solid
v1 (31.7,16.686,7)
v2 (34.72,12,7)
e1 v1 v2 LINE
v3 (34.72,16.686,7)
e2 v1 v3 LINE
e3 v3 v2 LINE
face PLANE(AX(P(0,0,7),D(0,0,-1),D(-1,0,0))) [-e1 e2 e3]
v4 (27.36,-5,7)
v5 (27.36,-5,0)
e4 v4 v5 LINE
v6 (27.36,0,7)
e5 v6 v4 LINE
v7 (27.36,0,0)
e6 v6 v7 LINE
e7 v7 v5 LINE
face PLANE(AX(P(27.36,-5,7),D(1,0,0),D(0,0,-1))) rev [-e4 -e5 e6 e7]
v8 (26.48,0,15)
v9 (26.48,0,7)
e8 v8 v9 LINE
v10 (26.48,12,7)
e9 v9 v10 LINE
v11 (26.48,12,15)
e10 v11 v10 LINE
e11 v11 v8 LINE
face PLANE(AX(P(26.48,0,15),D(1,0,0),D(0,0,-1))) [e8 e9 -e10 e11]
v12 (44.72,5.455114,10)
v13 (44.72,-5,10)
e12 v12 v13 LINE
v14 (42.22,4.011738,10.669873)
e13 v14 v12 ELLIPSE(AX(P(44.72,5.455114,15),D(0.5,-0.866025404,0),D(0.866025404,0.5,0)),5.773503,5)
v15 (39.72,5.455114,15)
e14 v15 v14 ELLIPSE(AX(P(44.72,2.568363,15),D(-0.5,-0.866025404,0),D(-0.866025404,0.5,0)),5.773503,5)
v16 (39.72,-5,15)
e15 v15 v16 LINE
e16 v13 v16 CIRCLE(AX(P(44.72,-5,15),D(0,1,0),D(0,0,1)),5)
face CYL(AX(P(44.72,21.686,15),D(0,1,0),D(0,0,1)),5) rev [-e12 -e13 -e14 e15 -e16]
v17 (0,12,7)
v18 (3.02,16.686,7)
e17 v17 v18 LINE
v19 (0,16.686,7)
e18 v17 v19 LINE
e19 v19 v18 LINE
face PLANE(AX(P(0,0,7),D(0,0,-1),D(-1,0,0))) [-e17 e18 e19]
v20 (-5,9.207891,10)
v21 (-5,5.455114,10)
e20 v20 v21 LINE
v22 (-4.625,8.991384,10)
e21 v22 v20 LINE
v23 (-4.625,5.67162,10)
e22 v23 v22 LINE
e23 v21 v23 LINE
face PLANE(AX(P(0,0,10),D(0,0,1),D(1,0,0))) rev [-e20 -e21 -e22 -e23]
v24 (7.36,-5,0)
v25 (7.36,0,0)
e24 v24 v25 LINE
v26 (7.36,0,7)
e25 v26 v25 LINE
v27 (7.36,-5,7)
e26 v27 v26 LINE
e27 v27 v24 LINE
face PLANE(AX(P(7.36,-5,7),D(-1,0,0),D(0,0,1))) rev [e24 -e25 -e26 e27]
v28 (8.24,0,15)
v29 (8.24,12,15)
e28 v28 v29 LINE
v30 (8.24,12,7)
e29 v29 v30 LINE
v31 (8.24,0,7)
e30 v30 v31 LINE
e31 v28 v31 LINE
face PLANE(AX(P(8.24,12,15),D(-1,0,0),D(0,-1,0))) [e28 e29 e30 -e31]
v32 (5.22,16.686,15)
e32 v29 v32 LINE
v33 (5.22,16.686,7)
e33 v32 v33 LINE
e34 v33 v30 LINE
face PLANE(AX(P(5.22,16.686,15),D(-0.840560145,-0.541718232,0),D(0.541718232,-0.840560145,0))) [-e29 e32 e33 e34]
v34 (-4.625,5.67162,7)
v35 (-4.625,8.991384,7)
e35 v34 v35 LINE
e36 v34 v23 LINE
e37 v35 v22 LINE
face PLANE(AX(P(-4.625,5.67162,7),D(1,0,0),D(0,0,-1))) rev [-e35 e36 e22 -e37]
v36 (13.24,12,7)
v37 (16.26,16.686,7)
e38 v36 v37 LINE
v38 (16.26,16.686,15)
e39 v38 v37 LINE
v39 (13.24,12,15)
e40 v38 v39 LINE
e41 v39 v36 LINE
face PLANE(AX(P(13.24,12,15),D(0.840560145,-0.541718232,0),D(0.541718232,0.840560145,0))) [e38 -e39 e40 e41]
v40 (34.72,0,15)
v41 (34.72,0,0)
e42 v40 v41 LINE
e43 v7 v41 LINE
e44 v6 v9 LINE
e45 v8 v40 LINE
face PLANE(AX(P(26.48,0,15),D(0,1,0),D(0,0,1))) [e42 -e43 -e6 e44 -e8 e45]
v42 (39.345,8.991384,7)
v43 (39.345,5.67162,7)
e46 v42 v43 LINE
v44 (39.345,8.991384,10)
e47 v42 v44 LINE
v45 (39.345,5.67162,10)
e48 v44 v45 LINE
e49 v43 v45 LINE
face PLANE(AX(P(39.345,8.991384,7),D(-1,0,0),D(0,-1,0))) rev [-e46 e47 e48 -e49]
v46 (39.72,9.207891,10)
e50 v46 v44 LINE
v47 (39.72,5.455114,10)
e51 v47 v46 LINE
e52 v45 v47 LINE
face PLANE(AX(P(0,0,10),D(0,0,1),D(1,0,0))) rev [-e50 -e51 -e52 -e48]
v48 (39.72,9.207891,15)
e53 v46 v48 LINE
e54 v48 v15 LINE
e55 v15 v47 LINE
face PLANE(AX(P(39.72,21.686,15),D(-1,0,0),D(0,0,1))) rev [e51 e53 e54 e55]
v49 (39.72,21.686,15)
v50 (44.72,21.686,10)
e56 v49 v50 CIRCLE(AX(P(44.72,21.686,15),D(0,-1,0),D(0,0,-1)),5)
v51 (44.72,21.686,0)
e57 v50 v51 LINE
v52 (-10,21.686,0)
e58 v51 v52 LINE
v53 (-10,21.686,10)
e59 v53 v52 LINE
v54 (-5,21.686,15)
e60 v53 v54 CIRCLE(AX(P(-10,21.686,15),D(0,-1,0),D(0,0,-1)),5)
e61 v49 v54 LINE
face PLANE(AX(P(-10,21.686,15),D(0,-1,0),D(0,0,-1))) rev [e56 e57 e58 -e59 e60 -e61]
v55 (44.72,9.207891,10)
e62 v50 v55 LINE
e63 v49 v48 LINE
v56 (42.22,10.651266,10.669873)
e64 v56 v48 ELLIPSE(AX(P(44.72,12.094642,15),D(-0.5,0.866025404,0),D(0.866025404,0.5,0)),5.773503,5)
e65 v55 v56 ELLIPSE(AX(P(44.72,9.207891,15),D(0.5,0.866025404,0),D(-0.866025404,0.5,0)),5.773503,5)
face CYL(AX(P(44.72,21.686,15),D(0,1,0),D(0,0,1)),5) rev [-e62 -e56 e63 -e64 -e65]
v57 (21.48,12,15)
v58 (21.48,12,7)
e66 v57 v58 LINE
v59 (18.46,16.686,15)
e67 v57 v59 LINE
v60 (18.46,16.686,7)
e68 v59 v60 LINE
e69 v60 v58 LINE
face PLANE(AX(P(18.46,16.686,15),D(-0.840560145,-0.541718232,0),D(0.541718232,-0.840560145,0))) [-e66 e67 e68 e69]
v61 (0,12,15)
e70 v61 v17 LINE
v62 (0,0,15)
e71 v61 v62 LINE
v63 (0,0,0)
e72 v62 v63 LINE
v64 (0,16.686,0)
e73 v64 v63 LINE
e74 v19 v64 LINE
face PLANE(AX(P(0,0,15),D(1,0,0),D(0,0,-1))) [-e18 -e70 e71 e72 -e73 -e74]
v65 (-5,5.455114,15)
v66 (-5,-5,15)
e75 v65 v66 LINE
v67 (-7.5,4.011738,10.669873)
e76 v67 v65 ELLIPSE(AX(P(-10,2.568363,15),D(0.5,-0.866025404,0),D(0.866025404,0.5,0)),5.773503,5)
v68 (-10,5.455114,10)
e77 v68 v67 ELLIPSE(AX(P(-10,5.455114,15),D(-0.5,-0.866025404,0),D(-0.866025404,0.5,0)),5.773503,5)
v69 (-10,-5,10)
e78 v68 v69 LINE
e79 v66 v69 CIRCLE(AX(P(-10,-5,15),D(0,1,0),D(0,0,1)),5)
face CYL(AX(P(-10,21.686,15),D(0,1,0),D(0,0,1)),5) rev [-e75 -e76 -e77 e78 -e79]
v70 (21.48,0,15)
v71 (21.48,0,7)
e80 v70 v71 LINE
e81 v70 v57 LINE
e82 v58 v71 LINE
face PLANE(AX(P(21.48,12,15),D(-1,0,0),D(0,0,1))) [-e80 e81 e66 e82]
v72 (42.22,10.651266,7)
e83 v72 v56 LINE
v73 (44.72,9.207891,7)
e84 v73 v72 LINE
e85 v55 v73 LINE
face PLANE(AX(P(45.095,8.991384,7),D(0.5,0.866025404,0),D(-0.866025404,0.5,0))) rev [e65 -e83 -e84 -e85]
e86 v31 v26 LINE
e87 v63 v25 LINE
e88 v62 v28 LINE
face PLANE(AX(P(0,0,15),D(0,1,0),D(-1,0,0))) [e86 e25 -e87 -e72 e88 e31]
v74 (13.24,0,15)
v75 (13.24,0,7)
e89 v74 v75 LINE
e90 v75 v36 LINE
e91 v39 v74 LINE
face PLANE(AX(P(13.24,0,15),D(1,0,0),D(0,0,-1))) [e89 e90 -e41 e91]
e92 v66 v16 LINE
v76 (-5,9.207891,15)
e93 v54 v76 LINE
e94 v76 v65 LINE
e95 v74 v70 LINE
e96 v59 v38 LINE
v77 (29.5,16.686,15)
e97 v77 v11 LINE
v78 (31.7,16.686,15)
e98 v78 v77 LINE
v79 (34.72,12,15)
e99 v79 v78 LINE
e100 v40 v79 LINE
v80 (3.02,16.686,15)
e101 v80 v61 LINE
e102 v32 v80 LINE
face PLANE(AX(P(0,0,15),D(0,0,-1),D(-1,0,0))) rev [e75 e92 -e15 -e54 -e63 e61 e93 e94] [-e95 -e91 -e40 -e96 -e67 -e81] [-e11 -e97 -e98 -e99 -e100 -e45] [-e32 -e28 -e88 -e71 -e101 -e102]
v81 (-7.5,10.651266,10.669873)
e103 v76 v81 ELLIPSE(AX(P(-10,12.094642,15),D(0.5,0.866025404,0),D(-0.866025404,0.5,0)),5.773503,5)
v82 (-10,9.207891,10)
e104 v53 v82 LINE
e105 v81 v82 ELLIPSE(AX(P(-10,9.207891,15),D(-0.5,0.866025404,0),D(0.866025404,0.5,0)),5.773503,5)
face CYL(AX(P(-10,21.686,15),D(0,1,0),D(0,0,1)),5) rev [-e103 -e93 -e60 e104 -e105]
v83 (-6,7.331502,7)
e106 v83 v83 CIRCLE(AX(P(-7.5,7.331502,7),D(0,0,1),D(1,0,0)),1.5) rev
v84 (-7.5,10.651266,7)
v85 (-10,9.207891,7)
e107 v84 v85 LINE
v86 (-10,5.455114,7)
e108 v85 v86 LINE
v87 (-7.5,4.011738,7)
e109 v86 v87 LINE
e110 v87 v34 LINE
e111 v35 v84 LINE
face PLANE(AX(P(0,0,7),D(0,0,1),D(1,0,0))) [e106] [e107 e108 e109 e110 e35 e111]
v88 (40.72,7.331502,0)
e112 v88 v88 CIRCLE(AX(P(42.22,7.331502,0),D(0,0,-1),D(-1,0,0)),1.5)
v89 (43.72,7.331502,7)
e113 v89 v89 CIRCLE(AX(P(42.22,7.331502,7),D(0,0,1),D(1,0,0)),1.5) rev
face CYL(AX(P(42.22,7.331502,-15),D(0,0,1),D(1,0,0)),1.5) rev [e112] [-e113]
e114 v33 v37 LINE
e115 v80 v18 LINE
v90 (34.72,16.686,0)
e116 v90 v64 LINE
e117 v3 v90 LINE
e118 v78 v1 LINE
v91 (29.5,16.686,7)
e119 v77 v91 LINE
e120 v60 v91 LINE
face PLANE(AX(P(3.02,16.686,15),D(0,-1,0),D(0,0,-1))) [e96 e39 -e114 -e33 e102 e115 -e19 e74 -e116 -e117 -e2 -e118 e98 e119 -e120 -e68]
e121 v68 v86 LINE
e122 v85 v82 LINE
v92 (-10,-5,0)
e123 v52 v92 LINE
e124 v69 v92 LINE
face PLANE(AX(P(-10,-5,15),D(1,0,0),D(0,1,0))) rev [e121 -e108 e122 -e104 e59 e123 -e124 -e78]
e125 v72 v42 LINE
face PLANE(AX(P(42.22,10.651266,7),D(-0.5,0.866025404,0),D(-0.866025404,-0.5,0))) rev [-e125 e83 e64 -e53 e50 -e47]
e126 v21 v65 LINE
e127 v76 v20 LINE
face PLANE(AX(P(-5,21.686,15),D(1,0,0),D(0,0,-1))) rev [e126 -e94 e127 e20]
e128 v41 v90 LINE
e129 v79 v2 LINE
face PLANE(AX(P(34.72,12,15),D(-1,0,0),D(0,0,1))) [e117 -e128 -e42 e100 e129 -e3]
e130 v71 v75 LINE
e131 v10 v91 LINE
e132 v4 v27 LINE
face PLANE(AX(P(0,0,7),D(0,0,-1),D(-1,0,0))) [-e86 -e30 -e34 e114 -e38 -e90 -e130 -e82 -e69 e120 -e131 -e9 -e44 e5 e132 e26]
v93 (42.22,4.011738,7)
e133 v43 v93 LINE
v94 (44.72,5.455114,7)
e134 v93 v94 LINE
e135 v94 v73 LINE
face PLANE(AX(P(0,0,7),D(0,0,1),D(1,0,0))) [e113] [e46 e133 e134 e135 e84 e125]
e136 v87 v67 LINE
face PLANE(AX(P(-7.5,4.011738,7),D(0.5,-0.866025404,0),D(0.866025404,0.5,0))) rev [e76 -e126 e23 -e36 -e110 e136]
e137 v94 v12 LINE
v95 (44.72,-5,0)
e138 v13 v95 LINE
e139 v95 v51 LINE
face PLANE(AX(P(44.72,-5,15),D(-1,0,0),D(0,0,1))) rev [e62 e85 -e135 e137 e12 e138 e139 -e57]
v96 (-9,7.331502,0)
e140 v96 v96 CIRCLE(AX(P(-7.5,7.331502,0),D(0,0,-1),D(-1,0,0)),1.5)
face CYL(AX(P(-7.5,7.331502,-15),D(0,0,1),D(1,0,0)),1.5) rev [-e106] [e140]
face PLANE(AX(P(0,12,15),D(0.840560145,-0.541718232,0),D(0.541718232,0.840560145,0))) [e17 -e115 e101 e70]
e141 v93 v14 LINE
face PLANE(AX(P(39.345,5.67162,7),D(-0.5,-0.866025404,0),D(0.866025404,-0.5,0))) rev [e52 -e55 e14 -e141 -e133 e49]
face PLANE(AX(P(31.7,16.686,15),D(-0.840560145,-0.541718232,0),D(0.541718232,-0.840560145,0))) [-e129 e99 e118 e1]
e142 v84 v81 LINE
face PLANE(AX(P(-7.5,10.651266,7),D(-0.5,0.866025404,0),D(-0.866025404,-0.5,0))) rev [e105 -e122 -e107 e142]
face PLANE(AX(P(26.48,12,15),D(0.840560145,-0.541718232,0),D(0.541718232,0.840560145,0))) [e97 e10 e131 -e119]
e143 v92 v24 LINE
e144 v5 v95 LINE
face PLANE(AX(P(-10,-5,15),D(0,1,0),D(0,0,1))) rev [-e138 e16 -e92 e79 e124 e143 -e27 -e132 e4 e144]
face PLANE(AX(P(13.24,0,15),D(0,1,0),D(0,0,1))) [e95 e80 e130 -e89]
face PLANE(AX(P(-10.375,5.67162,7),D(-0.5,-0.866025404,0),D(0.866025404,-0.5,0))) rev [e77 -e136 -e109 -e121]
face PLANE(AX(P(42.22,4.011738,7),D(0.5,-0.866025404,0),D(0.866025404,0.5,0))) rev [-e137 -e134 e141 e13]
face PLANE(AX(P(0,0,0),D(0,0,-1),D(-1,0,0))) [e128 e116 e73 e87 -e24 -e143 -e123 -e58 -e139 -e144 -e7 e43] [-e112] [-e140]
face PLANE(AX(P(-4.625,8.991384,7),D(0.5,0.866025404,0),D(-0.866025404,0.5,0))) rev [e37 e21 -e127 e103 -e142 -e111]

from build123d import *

# Parameters (mm, degrees)
SKETCH1_W           = 54.72
SKETCH1_H           = 26.686
BOSS_EXTRUDE1_DEPTH = 15
SKETCH2_W           = 5
SKETCH2_H           = 5
CUT_EXTRUDE1_DEPTH  = 55.19428933
SKETCH3_R           = 1.5
CUT_EXTRUDE2_DEPTH  = 25
CUT_EXTRUDE3_DEPTH  = 3
CUT_EXTRUDE5_DEPTH  = 7
FILLET2_R           = 5


with BuildPart() as part:
    # Sketch1 → Boss-Extrude1 (new body)
    with BuildSketch(Plane.XY):
        with Locations((17.36, 8.343)):
            Rectangle(SKETCH1_W, SKETCH1_H)
        Polygon((0, 0), (0, 12), (3.02, 16.686), (5.22, 16.686), (8.24, 12), (8.24, 0), align=None, mode=Mode.SUBTRACT)
        Polygon((18.46, 16.686), (21.48, 12), (21.48, 0), (13.24, 0), (13.24, 12), (16.26, 16.686), align=None, mode=Mode.SUBTRACT)
        Polygon((31.7, 16.686), (34.72, 12), (34.72, 0), (26.48, 0), (26.48, 12), (29.5, 16.686), align=None, mode=Mode.SUBTRACT)
    extrude(amount=BOSS_EXTRUDE1_DEPTH)

    # Sketch2 → Cut-Extrude1 (cut, through all)
    with BuildSketch(Plane(origin=(0, -5, 0), x_dir=(-1, 0, 0), z_dir=(0, -1, 0))):
        with Locations((7.5, -12.5)):
            Rectangle(SKETCH2_W, SKETCH2_H)
        with Locations((-42.22, -12.5)):
            Rectangle(SKETCH2_W, SKETCH2_H)
    extrude(amount=-CUT_EXTRUDE1_DEPTH, mode=Mode.SUBTRACT)

    # Sketch3 → Cut-Extrude2 (cut)
    with BuildSketch(Plane.XY.offset(10)):
        with Locations((-7.5, 7.331502285)):
            Circle(SKETCH3_R)
        with Locations((42.22, 7.331502285)):
            Circle(SKETCH3_R)
    extrude(amount=-CUT_EXTRUDE2_DEPTH, mode=Mode.SUBTRACT)

    # Sketch4 → Cut-Extrude3 (cut)
    with BuildSketch(Plane.XY.offset(10)):
        Polygon((-7.5, 10.651266332), (-10.375, 8.991384309), (-10.375, 5.671620261), (-7.5, 4.011738237), (-4.625, 5.671620261), (-4.625, 8.991384309), align=None)
        Polygon((42.22, 10.651266332), (39.345, 8.991384309), (39.345, 5.671620261), (42.22, 4.011738237), (45.095, 5.671620261), (45.095, 8.991384309), align=None)
    extrude(amount=-CUT_EXTRUDE3_DEPTH, mode=Mode.SUBTRACT)

    # Sketch7 → Cut-Extrude5 (cut)
    with BuildSketch(Plane(origin=(0, 0, 0), x_dir=(-1, 0, 0), z_dir=(0, 0, -1))):
        Polygon((0, 0), (-7.36, 0), (-7.36, -5), (-27.36, -5), (-27.36, 0), (-34.72, 0), (-34.72, 16.686), (0, 16.686), align=None)
    extrude(amount=-CUT_EXTRUDE5_DEPTH, mode=Mode.SUBTRACT)

    # Fillet2
    # the kernel refuses this fillet: 5 mm, written as the material it adds along each edge
    with BuildSketch(Plane(origin=(-5, -5, 10), x_dir=(-1, 0, 0), z_dir=(0, 1, 0))) as fillet2_piece_1_section:
        with BuildLine():
            CenterArc((FILLET2_R, FILLET2_R), FILLET2_R, 180, 90)
            Line((0, FILLET2_R), (0, 0))
            Line((0, 0), (FILLET2_R, 0))
        make_face()
    fillet2_piece_1 = extrude(amount=22.95511391, mode=Mode.PRIVATE)
    fillet2_piece_1 = split(fillet2_piece_1, bisect_by=Plane(origin=(-4.358665605, 2.198087978, 11.088883398), z_dir=(-0.5, -0.8660254037844387, 0)), keep=Keep.TOP, mode=Mode.PRIVATE)
    add(fillet2_piece_1)
    with BuildSketch(Plane(origin=(-5, -17.5, 10), x_dir=(-1, 0, 0), z_dir=(0, 1, 0))) as fillet2_piece_2_section:
        with BuildLine():
            CenterArc((FILLET2_R, FILLET2_R), FILLET2_R, 180, 90)
            Line((0, FILLET2_R), (0, 0))
            Line((0, 0), (FILLET2_R, 0))
        make_face()
    fillet2_piece_2 = extrude(amount=35.45511391, mode=Mode.PRIVATE)
    fillet2_piece_2 = split(fillet2_piece_2, bisect_by=Plane(origin=(-6.083354929, 4.82963865, 11.432065422), z_dir=(0.49999999999999967, -0.8660254037844388, 0)), keep=Keep.TOP, mode=Mode.PRIVATE)
    fillet2_piece_2 = split(fillet2_piece_2, bisect_by=Plane(origin=(-6.083354929, 3.193837824, 11.432065422), z_dir=(0.5, 0.8660254037844387, 0)), keep=Keep.TOP, mode=Mode.PRIVATE)
    add(fillet2_piece_2)
    with BuildSketch(Plane(origin=(-5, -17.5, 10), x_dir=(-1, 0, 0), z_dir=(0, 1, 0))) as fillet2_piece_3_section:
        with BuildLine():
            CenterArc((FILLET2_R, FILLET2_R), FILLET2_R, 180, 90)
            Line((0, FILLET2_R), (0, 0))
            Line((0, 0), (FILLET2_R, 0))
        make_face()
    fillet2_piece_3 = extrude(amount=35.45511391, mode=Mode.PRIVATE)
    fillet2_piece_3 = split(fillet2_piece_3, bisect_by=Plane(origin=(-6.083354929, 9.83336592, 11.432065422), z_dir=(0.5000000000000001, 0.8660254037844387, 0)), keep=Keep.TOP, mode=Mode.PRIVATE)
    add(fillet2_piece_3)
    with BuildSketch(Plane(origin=(-5, -17.5, 10), x_dir=(-1, 0, 0), z_dir=(0, 1, 0))) as fillet2_piece_4_section:
        with BuildLine():
            CenterArc((FILLET2_R, FILLET2_R), FILLET2_R, 180, 90)
            Line((0, FILLET2_R), (0, 0))
            Line((0, 0), (FILLET2_R, 0))
        make_face()
    fillet2_piece_4 = extrude(amount=35.45511391, mode=Mode.PRIVATE)
    fillet2_piece_4 = split(fillet2_piece_4, bisect_by=Plane(origin=(-8.244164443, 10.221622791, 10.130784203), z_dir=(-0.5000000000000001, 0.8660254037844387, 0)), keep=Keep.TOP, mode=Mode.PRIVATE)
    add(fillet2_piece_4)
    with BuildSketch(Plane(origin=(-5, -3.292109341, 10), x_dir=(-1, 0, 0), z_dir=(0, 1, 0))) as fillet2_piece_5_section:
        with BuildLine():
            CenterArc((FILLET2_R, FILLET2_R), FILLET2_R, 180, 90)
            Line((0, FILLET2_R), (0, 0))
            Line((0, 0), (FILLET2_R, 0))
        make_face()
    fillet2_piece_5 = extrude(amount=37.478109341, mode=Mode.PRIVATE)
    fillet2_piece_5 = split(fillet2_piece_5, bisect_by=Plane(origin=(-8.244164443, 4.441381778, 10.130784203), z_dir=(-0.5, -0.8660254037844387, 0)), keep=Keep.TOP, mode=Mode.PRIVATE)
    add(fillet2_piece_5)
    with BuildSketch(Plane(origin=(-5, -3.292109341, 10), x_dir=(-1, 0, 0), z_dir=(0, 1, 0))) as fillet2_piece_6_section:
        with BuildLine():
            CenterArc((FILLET2_R, FILLET2_R), FILLET2_R, 180, 90)
            Line((0, FILLET2_R), (0, 0))
            Line((0, 0), (FILLET2_R, 0))
        make_face()
    fillet2_piece_6 = extrude(amount=37.478109341, mode=Mode.PRIVATE)
    fillet2_piece_6 = split(fillet2_piece_6, bisect_by=Plane(origin=(-6.083354929, 4.82963865, 11.432065422), z_dir=(0.49999999999999967, -0.8660254037844388, 0)), keep=Keep.TOP, mode=Mode.PRIVATE)
    add(fillet2_piece_6)
    with BuildSketch(Plane(origin=(-5, -3.292109341, 10), x_dir=(-1, 0, 0), z_dir=(0, 1, 0))) as fillet2_piece_7_section:
        with BuildLine():
            CenterArc((FILLET2_R, FILLET2_R), FILLET2_R, 180, 90)
            Line((0, FILLET2_R), (0, 0))
            Line((0, 0), (FILLET2_R, 0))
        make_face()
    fillet2_piece_7 = extrude(amount=24.978109341, mode=Mode.PRIVATE)
    fillet2_piece_7 = split(fillet2_piece_7, bisect_by=Plane(origin=(-6.083354929, 9.83336592, 11.432065422), z_dir=(0.5000000000000001, 0.8660254037844387, 0)), keep=Keep.TOP, mode=Mode.PRIVATE)
    add(fillet2_piece_7)
    with BuildSketch(Plane(origin=(-5, -3.292109341, 10), x_dir=(-1, 0, 0), z_dir=(0, 1, 0))) as fillet2_piece_8_section:
        with BuildLine():
            CenterArc((FILLET2_R, FILLET2_R), FILLET2_R, 180, 90)
            Line((0, FILLET2_R), (0, 0))
            Line((0, 0), (FILLET2_R, 0))
        make_face()
    fillet2_piece_8 = extrude(amount=37.478109341, mode=Mode.PRIVATE)
    fillet2_piece_8 = split(fillet2_piece_8, bisect_by=Plane(origin=(-8.244164443, 11.080909874, 10.130784203), z_dir=(-0.5000000000000001, -0.8660254037844387, 0)), keep=Keep.TOP, mode=Mode.PRIVATE)
    fillet2_piece_8 = split(fillet2_piece_8, bisect_by=Plane(origin=(-8.244164443, 10.221622791, 10.130784203), z_dir=(-0.5000000000000001, 0.8660254037844387, 0)), keep=Keep.TOP, mode=Mode.PRIVATE)
    add(fillet2_piece_8)
    with BuildSketch(Plane(origin=(39.72, -3.292109341, 10), x_dir=(1, 0, 0), z_dir=(0, 1, 0))) as fillet2_piece_9_section:
        with BuildLine():
            CenterArc((FILLET2_R, -FILLET2_R), FILLET2_R, 90, 90)
            Line((0, -FILLET2_R), (0, 0))
            Line((0, 0), (FILLET2_R, 0))
        make_face()
    fillet2_piece_9 = extrude(amount=37.478109341, mode=Mode.PRIVATE)
    fillet2_piece_9 = split(fillet2_piece_9, bisect_by=Plane(origin=(42.964164443, 4.441381778, 10.130784203), z_dir=(0.4999999999999993, -0.866025403784439, 0)), keep=Keep.TOP, mode=Mode.PRIVATE)
    add(fillet2_piece_9)
    with BuildSketch(Plane(origin=(39.72, -3.292109341, 10), x_dir=(1, 0, 0), z_dir=(0, 1, 0))) as fillet2_piece_10_section:
        with BuildLine():
            CenterArc((FILLET2_R, -FILLET2_R), FILLET2_R, 90, 90)
            Line((0, -FILLET2_R), (0, 0))
            Line((0, 0), (FILLET2_R, 0))
        make_face()
    fillet2_piece_10 = extrude(amount=37.478109341, mode=Mode.PRIVATE)
    fillet2_piece_10 = split(fillet2_piece_10, bisect_by=Plane(origin=(40.803354929, 4.82963865, 11.432065422), z_dir=(-0.5000000000000001, -0.8660254037844386, 0)), keep=Keep.TOP, mode=Mode.PRIVATE)
    add(fillet2_piece_10)
    with BuildSketch(Plane(origin=(39.72, -3.292109341, 10), x_dir=(1, 0, 0), z_dir=(0, 1, 0))) as fillet2_piece_11_section:
        with BuildLine():
            CenterArc((FILLET2_R, -FILLET2_R), FILLET2_R, 90, 90)
            Line((0, -FILLET2_R), (0, 0))
            Line((0, 0), (FILLET2_R, 0))
        make_face()
    fillet2_piece_11 = extrude(amount=24.978109341, mode=Mode.PRIVATE)
    fillet2_piece_11 = split(fillet2_piece_11, bisect_by=Plane(origin=(40.803354929, 9.83336592, 11.432065422), z_dir=(-0.5, 0.8660254037844387, 0)), keep=Keep.TOP, mode=Mode.PRIVATE)
    add(fillet2_piece_11)
    with BuildSketch(Plane(origin=(39.72, -3.292109341, 10), x_dir=(1, 0, 0), z_dir=(0, 1, 0))) as fillet2_piece_12_section:
        with BuildLine():
            CenterArc((FILLET2_R, -FILLET2_R), FILLET2_R, 90, 90)
            Line((0, -FILLET2_R), (0, 0))
            Line((0, 0), (FILLET2_R, 0))
        make_face()
    fillet2_piece_12 = extrude(amount=37.478109341, mode=Mode.PRIVATE)
    fillet2_piece_12 = split(fillet2_piece_12, bisect_by=Plane(origin=(42.964164443, 11.080909874, 10.130784203), z_dir=(0.5, -0.8660254037844387, 0)), keep=Keep.TOP, mode=Mode.PRIVATE)
    fillet2_piece_12 = split(fillet2_piece_12, bisect_by=Plane(origin=(42.964164443, 10.221622791, 10.130784203), z_dir=(0.4999999999999985, 0.8660254037844396, 0)), keep=Keep.TOP, mode=Mode.PRIVATE)
    add(fillet2_piece_12)
    with BuildSketch(Plane(origin=(39.72, -5, 10), x_dir=(0, 0, 1), z_dir=(0, 1, 0))) as fillet2_piece_13_section:
        with BuildLine():
            CenterArc((FILLET2_R, FILLET2_R), FILLET2_R, 180, 90)
            Line((0, FILLET2_R), (0, 0))
            Line((0, 0), (FILLET2_R, 0))
        make_face()
    fillet2_piece_13 = extrude(amount=22.95511391, mode=Mode.PRIVATE)
    fillet2_piece_13 = split(fillet2_piece_13, bisect_by=Plane(origin=(39.078665605, 2.198087978, 11.088883398), z_dir=(0.4999999999999993, -0.866025403784439, 0)), keep=Keep.TOP, mode=Mode.PRIVATE)
    add(fillet2_piece_13)
    with BuildSketch(Plane(origin=(39.72, -17.5, 10), x_dir=(0, 0, 1), z_dir=(0, 1, 0))) as fillet2_piece_14_section:
        with BuildLine():
            CenterArc((FILLET2_R, FILLET2_R), FILLET2_R, 180, 90)
            Line((0, FILLET2_R), (0, 0))
            Line((0, 0), (FILLET2_R, 0))
        make_face()
    fillet2_piece_14 = extrude(amount=35.45511391, mode=Mode.PRIVATE)
    fillet2_piece_14 = split(fillet2_piece_14, bisect_by=Plane(origin=(40.803354929, 4.82963865, 11.432065422), z_dir=(-0.5000000000000001, -0.8660254037844386, 0)), keep=Keep.TOP, mode=Mode.PRIVATE)
    fillet2_piece_14 = split(fillet2_piece_14, bisect_by=Plane(origin=(40.803354929, 3.193837824, 11.432065422), z_dir=(-0.4999999999999993, 0.866025403784439, 0)), keep=Keep.TOP, mode=Mode.PRIVATE)
    add(fillet2_piece_14)
    with BuildSketch(Plane(origin=(39.72, -17.5, 10), x_dir=(0, 0, 1), z_dir=(0, 1, 0))) as fillet2_piece_15_section:
        with BuildLine():
            CenterArc((FILLET2_R, FILLET2_R), FILLET2_R, 180, 90)
            Line((0, FILLET2_R), (0, 0))
            Line((0, 0), (FILLET2_R, 0))
        make_face()
    fillet2_piece_15 = extrude(amount=35.45511391, mode=Mode.PRIVATE)
    fillet2_piece_15 = split(fillet2_piece_15, bisect_by=Plane(origin=(42.964164443, 10.221622791, 10.130784203), z_dir=(0.4999999999999985, 0.8660254037844396, 0)), keep=Keep.TOP, mode=Mode.PRIVATE)
    add(fillet2_piece_15)
    with BuildSketch(Plane(origin=(39.72, -17.5, 10), x_dir=(0, 0, 1), z_dir=(0, 1, 0))) as fillet2_piece_16_section:
        with BuildLine():
            CenterArc((FILLET2_R, FILLET2_R), FILLET2_R, 180, 90)
            Line((0, FILLET2_R), (0, 0))
            Line((0, 0), (FILLET2_R, 0))
        make_face()
    fillet2_piece_16 = extrude(amount=35.45511391, mode=Mode.PRIVATE)
    fillet2_piece_16 = split(fillet2_piece_16, bisect_by=Plane(origin=(40.803354929, 9.833365919, 11.432065422), z_dir=(-0.5, 0.8660254037844387, 0)), keep=Keep.TOP, mode=Mode.PRIVATE)
    add(fillet2_piece_16)


solid = part.part
